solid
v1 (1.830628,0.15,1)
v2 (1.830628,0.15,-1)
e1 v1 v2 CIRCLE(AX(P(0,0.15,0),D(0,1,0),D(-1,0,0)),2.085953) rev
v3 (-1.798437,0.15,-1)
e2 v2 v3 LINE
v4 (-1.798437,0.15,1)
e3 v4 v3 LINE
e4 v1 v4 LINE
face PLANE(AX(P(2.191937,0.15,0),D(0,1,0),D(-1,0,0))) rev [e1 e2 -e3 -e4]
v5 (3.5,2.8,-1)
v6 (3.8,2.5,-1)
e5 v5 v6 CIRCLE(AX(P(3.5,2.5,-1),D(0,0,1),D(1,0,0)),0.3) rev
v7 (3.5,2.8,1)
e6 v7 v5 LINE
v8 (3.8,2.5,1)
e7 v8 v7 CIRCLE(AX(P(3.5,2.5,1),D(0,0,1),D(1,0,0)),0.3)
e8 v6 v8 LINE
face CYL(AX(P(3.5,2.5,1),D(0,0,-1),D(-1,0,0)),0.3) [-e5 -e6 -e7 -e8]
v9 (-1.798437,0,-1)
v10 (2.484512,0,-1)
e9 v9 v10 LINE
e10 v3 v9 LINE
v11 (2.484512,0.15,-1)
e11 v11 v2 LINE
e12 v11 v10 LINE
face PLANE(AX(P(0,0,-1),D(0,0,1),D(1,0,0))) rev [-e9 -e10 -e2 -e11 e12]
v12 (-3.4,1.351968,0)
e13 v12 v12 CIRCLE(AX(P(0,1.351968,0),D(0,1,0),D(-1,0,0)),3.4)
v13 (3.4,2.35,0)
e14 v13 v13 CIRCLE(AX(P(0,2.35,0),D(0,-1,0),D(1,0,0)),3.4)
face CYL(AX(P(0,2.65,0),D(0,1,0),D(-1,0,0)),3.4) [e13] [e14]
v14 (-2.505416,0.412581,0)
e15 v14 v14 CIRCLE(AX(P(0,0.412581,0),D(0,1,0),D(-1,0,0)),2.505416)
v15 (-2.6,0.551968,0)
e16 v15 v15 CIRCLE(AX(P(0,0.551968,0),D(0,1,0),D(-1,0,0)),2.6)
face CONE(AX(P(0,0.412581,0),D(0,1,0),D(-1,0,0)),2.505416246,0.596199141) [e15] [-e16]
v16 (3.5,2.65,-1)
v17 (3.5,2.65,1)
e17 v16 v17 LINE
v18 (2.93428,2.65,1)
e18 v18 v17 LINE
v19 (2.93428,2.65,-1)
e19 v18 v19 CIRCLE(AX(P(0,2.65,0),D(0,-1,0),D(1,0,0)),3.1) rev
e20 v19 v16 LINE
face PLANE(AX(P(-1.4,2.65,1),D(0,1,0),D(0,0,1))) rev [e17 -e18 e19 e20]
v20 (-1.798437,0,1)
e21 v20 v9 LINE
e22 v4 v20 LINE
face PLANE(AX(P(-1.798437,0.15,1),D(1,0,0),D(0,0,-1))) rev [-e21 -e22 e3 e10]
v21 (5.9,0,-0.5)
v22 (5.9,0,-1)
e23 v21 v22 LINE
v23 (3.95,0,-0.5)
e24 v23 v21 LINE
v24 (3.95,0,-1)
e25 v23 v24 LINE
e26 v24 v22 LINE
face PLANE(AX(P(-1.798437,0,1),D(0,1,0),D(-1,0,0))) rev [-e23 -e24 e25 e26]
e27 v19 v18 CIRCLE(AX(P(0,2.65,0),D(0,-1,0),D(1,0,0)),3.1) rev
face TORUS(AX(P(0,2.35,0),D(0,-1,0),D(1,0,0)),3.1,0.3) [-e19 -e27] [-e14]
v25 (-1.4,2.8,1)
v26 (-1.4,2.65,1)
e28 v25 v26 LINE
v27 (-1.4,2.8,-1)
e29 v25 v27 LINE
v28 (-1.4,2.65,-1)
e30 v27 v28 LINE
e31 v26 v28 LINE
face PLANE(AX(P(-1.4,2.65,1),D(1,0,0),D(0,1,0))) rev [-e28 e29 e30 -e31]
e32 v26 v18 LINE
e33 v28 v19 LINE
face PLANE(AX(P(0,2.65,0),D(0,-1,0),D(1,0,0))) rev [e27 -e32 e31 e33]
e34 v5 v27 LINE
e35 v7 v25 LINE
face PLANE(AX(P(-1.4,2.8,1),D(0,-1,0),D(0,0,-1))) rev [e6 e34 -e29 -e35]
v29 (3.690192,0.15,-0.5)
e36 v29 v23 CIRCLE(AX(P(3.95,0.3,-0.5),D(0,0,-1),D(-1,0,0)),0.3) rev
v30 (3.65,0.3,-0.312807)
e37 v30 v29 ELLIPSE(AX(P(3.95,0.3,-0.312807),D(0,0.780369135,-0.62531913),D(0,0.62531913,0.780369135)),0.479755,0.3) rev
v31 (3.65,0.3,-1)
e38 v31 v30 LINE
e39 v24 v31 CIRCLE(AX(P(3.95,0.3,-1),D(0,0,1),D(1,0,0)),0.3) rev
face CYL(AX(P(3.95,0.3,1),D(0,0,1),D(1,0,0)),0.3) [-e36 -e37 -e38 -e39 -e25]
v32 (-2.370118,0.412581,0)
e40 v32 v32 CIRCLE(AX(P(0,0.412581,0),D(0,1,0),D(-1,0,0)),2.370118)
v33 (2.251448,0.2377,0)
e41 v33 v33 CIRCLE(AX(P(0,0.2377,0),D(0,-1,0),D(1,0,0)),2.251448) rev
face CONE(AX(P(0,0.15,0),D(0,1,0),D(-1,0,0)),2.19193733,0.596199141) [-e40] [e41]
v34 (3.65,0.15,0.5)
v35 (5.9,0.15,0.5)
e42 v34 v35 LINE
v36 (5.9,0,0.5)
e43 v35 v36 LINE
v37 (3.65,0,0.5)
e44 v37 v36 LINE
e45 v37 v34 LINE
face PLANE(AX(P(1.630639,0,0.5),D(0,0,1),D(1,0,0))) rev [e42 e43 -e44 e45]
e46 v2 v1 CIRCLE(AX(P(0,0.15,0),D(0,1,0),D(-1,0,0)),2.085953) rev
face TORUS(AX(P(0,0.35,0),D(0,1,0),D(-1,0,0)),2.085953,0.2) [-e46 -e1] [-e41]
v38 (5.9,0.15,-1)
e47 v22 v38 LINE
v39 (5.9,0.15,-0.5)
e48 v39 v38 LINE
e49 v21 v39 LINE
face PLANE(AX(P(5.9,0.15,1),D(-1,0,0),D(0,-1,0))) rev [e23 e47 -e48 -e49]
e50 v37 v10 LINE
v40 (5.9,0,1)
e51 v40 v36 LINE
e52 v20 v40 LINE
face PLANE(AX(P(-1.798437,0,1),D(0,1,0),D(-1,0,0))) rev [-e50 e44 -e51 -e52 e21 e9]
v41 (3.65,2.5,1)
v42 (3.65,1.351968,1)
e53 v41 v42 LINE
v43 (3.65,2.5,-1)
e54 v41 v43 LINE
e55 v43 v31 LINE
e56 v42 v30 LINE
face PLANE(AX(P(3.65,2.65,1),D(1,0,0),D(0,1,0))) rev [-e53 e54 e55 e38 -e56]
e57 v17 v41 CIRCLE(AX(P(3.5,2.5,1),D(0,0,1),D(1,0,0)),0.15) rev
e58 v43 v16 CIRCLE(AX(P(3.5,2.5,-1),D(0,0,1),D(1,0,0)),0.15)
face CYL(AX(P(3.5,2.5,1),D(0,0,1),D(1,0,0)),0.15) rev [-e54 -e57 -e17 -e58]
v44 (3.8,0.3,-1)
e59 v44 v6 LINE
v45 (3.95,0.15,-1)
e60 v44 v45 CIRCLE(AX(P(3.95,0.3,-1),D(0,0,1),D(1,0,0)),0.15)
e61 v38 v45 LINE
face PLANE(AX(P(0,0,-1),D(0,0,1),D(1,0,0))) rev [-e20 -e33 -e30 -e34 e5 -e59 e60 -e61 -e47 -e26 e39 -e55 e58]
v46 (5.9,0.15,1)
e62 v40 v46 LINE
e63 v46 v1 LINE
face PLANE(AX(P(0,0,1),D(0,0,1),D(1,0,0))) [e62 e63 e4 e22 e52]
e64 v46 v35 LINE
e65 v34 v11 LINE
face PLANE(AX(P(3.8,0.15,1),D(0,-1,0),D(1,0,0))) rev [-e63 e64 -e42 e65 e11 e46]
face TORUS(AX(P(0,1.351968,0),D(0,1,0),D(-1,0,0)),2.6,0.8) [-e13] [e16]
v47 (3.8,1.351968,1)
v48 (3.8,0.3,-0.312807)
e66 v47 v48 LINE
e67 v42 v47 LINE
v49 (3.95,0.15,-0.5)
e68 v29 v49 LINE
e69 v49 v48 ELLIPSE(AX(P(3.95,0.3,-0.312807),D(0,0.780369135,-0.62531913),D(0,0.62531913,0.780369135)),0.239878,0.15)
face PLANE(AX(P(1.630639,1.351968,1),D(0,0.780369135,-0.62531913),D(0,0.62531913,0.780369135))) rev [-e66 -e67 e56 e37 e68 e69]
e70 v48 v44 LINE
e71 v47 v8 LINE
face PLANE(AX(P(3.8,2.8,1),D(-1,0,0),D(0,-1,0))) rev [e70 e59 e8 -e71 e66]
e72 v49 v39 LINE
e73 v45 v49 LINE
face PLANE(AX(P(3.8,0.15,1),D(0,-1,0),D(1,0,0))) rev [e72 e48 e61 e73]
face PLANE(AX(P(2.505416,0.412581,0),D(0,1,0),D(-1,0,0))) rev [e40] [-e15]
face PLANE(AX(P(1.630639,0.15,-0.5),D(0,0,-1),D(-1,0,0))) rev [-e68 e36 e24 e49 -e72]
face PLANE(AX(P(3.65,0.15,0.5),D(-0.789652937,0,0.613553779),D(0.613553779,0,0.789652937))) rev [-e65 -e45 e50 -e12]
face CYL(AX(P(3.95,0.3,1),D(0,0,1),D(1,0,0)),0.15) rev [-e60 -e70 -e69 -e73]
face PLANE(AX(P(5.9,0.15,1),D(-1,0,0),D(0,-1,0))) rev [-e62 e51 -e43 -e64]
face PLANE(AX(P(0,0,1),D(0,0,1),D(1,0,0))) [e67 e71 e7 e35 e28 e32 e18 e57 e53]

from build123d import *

# Parameters (mm, degrees)
FILLET_1_R          = 0.3
FILLET_2_R          = 0.8
FILLET_3_R          = 0.2
EXTRUDE_1_DEPTH     = 1
CUT_EXTRUDE_1_DEPTH = 2.25
CUT_EXTRUDE_2_DEPTH = 0.15
FILLET_5_R          = 0.15
FILLET_4_R          = 0.3


with BuildPart() as part:
    # 草图1 → 旋转1 (revolve)
    with BuildSketch(Plane.XY, mode=Mode.PRIVATE) as revolve_1_sk:
        Polygon((0, 2.65), (3.4, 2.65), (3.4, 0.551967957), (2.6, 0.551967957), (2.505416246, 0.412581372), (2.370117547, 0.412581372), (2.19193733, 0.15), (0, 0.15), align=None)
    revolve(revolve_1_sk.sketch.rotate(Axis((0, 2.65, 0), (0, -1, 0)), 180), axis=Axis((0, 2.65, 0), (0, -1, 0)))

    # 圆角1
    fillet_1_edges = [part.edges().sort_by_distance(p)[0] for p in [
        (3.4, 2.65, 0),
    ]]
    fillet(fillet_1_edges, radius=FILLET_1_R)

    # 圆角2
    fillet_2_edges = [part.edges().sort_by_distance(p)[0] for p in [
        (3.4, 0.551967957, 0),
    ]]
    fillet(fillet_2_edges, radius=FILLET_2_R - 0.0001)  # a hair under: the kernel refuses the full size

    # 圆角3
    fillet_3_edges = [part.edges().sort_by_distance(p)[0] for p in [
        (2.19193733, 0.15, 0),
    ]]
    fillet(fillet_3_edges, radius=FILLET_3_R)

    # 草图3 → 凸台-拉伸1 (add, symmetric)
    with BuildSketch(Plane.XY):
        Polygon((-1.798436821, 0.15), (3.65, 0.15), (3.65, 2.65), (-1.4, 2.65), (-1.4, 2.8), (3.8, 2.8), (3.8, 0.15), (5.9, 0.15), (5.9, 0), (-1.798436821, 0), align=None)
    extrude(amount=EXTRUDE_1_DEPTH, both=True)

    # 草图4 → 切除-拉伸1 (cut)
    with BuildSketch(Plane(origin=(5.9, 0, 0), x_dir=(0, 0, -1), z_dir=(1, 0, 0))):
        Polygon((-1, 1.351967957), (0.5, 0.15), (0.5, 0), (-0.5, 0), (-0.5, 0.15), (-1, 0.15), align=None)
    extrude(amount=-CUT_EXTRUDE_1_DEPTH, mode=Mode.SUBTRACT)

    # 草图5 → 切除-拉伸2 (cut)
    with BuildSketch(Plane.XZ):
        Polygon((3.65, 0.5), (2.484512448, -1), (3.65, -1), align=None)
    extrude(amount=-CUT_EXTRUDE_2_DEPTH, mode=Mode.SUBTRACT)

    # 圆角5
    fillet_5_edges = [part.edges().sort_by_distance(p)[0] for p in [
        (3.65, 2.65, 0),
        (3.8, 0.15, -0.75),
    ]]
    fillet(fillet_5_edges, radius=FILLET_5_R)

    # 圆角4
    fillet_4_edges = [part.edges().sort_by_distance(p)[0] for p in [
        (3.65, 0, -0.75),
        (3.8, 2.8, 0),
    ]]
    fillet(fillet_4_edges, radius=FILLET_4_R)


solid = part.part
